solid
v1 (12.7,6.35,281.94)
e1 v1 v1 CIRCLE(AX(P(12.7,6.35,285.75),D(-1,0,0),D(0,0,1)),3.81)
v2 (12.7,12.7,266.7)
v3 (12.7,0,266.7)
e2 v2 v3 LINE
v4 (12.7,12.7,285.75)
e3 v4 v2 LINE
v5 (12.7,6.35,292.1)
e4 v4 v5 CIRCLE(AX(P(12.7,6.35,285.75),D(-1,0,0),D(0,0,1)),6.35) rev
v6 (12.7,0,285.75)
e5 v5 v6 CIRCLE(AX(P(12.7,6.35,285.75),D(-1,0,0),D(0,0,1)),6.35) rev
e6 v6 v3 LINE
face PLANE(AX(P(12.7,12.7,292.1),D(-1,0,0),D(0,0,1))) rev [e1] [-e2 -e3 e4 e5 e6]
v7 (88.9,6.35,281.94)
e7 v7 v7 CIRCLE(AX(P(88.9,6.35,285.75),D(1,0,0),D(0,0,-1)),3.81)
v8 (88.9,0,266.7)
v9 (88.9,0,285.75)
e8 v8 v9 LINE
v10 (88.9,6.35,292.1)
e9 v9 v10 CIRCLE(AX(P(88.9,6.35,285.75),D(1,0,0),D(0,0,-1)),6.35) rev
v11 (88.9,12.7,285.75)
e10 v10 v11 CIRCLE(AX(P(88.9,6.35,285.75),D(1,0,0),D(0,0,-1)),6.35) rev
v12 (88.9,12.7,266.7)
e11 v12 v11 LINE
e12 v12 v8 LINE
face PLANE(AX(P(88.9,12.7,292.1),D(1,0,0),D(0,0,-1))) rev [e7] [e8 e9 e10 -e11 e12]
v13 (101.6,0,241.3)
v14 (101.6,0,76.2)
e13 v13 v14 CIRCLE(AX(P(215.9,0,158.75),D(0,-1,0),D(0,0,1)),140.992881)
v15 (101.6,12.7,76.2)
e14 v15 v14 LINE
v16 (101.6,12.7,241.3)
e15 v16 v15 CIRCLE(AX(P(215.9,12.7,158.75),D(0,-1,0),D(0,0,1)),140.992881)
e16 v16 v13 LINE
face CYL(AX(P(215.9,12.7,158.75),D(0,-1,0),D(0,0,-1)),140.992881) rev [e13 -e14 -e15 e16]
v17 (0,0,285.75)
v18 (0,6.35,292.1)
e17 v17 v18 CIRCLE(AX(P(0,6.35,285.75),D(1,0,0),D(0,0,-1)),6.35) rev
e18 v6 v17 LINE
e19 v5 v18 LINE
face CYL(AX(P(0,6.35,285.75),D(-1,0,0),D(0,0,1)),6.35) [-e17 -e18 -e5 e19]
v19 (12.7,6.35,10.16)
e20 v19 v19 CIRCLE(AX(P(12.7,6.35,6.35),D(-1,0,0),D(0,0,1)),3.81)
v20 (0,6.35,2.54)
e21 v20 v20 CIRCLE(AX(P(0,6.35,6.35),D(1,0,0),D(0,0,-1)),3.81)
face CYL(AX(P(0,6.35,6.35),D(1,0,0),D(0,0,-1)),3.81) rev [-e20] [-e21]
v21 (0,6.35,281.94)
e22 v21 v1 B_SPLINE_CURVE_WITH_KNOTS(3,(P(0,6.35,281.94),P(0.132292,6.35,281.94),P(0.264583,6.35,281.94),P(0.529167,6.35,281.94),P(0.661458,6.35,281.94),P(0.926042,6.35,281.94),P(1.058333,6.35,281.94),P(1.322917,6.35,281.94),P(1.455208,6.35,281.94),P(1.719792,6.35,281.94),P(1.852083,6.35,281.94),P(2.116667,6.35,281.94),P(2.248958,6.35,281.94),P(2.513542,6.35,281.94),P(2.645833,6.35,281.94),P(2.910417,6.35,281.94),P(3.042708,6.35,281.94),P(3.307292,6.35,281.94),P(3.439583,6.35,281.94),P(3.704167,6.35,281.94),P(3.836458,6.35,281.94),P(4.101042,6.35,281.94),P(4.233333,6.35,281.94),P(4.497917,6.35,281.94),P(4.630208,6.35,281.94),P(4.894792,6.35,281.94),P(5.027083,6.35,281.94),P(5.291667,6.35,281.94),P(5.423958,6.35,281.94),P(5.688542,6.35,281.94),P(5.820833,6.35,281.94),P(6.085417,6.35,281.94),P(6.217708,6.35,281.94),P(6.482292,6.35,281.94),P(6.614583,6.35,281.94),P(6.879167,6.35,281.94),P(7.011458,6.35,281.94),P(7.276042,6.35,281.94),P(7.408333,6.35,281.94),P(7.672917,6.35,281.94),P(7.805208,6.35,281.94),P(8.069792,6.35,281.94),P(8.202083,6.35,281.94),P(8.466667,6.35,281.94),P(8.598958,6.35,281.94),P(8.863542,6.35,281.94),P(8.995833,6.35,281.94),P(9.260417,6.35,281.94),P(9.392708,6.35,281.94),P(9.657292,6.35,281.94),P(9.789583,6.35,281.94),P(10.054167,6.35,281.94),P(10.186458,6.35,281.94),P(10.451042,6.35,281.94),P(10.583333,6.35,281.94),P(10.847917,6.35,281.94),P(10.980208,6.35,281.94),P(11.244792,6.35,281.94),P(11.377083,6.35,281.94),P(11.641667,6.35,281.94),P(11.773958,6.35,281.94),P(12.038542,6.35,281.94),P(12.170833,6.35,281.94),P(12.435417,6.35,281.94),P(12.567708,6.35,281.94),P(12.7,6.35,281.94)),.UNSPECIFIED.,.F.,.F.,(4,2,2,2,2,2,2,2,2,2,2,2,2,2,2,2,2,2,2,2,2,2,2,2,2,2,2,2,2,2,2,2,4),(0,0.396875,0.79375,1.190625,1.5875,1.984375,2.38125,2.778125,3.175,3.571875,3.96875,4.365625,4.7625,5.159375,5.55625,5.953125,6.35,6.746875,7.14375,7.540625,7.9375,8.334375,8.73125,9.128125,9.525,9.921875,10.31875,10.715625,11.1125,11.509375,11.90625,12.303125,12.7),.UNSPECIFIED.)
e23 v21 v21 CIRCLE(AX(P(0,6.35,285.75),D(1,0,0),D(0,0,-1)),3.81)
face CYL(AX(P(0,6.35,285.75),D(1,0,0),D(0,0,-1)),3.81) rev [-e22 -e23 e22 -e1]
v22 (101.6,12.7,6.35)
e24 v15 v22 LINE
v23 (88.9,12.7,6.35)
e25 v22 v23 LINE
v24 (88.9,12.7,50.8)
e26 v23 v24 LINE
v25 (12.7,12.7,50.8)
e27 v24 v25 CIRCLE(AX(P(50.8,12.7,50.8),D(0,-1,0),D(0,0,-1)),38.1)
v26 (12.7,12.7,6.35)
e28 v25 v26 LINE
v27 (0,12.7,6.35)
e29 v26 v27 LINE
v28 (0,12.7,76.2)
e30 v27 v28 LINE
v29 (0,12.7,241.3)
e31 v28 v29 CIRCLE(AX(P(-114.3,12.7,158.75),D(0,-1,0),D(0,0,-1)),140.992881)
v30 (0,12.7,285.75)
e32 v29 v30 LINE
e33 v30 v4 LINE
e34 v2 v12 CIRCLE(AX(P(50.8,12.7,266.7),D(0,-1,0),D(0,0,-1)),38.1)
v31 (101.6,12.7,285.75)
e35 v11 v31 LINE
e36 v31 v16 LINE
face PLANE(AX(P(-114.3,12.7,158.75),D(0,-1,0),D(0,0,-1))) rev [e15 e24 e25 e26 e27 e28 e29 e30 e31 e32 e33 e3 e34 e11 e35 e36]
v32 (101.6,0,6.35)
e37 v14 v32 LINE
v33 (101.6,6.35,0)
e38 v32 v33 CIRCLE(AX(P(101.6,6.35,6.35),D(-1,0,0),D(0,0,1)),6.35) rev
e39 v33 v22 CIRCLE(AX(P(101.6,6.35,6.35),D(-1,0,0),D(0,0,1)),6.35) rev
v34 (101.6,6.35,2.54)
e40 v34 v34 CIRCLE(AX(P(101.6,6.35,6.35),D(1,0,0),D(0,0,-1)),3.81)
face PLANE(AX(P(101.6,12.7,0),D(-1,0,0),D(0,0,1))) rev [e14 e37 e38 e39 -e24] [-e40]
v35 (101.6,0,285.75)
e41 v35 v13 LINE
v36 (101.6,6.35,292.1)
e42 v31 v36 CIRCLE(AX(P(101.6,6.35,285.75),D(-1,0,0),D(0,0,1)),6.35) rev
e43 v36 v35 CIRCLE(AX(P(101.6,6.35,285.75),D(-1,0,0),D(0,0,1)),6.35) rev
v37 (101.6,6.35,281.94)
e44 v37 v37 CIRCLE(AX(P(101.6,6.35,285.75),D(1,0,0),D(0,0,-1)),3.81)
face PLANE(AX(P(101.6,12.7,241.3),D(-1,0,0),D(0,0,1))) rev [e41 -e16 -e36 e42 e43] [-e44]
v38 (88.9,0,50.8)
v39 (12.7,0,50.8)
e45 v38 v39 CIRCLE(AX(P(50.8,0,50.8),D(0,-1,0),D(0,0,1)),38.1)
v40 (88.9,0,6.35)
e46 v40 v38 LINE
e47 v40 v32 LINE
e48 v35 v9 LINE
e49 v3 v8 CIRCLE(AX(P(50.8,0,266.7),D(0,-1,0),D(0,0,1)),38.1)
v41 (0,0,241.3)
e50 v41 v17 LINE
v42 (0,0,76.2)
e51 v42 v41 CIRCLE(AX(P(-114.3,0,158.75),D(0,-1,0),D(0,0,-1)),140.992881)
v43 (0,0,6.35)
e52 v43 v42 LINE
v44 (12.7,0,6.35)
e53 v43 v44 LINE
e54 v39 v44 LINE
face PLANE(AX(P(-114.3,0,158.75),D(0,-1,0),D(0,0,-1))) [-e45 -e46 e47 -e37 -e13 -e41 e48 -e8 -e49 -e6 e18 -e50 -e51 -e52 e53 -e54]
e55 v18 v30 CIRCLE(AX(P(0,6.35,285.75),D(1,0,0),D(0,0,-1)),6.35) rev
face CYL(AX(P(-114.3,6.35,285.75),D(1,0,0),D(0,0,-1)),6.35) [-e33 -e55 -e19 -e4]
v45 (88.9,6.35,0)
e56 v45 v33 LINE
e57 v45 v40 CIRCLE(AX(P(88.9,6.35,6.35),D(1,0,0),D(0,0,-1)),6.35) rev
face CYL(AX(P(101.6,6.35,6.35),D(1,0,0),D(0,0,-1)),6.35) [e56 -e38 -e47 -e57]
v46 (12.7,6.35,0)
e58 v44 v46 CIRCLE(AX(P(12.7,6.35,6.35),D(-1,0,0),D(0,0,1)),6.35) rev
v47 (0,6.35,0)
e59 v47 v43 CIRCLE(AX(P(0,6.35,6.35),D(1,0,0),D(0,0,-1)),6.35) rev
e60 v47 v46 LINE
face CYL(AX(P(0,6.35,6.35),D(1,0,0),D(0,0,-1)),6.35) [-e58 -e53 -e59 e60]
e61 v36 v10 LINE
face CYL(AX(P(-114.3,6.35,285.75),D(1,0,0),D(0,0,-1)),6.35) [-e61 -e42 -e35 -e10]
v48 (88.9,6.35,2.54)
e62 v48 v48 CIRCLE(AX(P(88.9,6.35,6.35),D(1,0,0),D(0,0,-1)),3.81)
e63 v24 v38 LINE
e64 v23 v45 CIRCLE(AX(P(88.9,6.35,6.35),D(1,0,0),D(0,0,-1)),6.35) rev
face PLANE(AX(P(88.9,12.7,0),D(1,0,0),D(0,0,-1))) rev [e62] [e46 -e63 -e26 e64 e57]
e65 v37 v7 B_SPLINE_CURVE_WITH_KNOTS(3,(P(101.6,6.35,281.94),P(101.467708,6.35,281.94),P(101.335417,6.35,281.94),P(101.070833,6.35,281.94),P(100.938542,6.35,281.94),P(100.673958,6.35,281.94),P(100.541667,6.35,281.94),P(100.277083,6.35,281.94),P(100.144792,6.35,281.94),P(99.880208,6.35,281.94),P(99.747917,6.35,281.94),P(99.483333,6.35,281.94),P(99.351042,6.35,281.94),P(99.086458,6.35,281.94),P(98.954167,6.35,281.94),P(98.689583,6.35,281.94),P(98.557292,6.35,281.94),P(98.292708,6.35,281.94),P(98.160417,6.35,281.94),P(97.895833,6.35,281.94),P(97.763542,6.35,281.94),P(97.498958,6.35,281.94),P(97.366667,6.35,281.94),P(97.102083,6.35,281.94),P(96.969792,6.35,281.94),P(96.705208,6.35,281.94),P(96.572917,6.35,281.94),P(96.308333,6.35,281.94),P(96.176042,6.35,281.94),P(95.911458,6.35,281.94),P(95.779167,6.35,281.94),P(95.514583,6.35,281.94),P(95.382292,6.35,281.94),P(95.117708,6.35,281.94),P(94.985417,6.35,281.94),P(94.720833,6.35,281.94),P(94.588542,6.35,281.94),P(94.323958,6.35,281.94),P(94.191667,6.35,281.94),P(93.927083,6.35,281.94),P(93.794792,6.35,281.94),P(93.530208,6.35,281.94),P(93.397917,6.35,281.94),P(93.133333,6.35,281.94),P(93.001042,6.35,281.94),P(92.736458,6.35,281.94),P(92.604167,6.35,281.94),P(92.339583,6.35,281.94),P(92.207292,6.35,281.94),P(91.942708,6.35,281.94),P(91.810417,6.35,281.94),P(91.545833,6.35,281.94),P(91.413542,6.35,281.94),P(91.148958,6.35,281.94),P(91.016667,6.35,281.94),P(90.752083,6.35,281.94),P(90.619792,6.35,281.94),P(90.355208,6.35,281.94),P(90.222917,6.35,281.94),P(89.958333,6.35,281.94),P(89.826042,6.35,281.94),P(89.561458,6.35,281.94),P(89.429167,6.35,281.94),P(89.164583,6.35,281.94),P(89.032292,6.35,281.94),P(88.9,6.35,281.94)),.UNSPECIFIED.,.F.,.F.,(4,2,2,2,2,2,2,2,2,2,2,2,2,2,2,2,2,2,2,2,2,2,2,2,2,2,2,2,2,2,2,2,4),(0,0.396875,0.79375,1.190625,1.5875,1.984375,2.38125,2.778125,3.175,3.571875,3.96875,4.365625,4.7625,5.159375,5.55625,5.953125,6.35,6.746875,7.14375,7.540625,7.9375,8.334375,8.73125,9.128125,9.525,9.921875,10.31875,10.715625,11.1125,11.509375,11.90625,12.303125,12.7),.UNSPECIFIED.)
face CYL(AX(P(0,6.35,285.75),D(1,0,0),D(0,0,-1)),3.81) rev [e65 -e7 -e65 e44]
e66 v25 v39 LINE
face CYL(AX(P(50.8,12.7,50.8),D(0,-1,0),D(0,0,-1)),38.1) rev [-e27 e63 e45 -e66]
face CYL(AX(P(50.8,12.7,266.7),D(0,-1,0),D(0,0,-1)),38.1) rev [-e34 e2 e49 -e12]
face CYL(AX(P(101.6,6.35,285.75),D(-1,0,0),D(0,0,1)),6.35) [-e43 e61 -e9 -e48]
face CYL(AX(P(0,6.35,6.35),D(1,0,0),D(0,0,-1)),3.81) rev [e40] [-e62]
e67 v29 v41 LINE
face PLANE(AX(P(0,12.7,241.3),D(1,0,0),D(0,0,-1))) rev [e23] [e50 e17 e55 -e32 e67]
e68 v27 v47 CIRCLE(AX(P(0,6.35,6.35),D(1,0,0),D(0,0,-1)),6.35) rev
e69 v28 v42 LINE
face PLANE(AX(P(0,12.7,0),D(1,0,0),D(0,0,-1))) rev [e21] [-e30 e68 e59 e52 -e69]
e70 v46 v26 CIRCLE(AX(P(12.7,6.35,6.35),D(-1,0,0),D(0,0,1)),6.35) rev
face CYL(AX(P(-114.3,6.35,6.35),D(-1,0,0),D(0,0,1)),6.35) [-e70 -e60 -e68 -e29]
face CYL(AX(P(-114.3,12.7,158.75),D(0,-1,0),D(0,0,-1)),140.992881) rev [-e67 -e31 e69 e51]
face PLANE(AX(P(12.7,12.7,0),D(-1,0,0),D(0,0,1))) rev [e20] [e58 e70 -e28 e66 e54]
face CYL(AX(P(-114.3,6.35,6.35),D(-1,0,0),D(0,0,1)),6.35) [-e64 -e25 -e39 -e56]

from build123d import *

# Parameters (mm, degrees)
BOSS_EXTRUDE1_DEPTH = 12.7
FILLET1_R           = 6.35
SKETCH2_R           = 3.81
CUT_EXTRUDE1_DEPTH  = 310.525863217
SKETCH3_R           = 3.81
CUT_EXTRUDE2_DEPTH  = 310.525863217


with BuildPart() as part:
    # Sketch1 → Boss-Extrude1 (new body)
    with BuildSketch(Plane(origin=(0, 0, 0), x_dir=(1, 0, 0), z_dir=(0, 1, 0))):
        with BuildLine():
            Line((0, 0), (12.7, 0))
            Line((12.7, 0), (12.7, -50.8))
            ThreePointArc((12.7, -50.8), (23.859231637, -77.740768363), (50.8, -88.9))
            ThreePointArc((50.8, -88.9), (77.740768363, -77.740768363), (88.9, -50.8))
            Line((88.9, -50.8), (88.9, 0))
            Line((88.9, 0), (101.6, 0))
            Line((101.6, 0), (101.6, -76.2))
            ThreePointArc((101.6, -76.2), (74.907118974, -158.75), (101.6, -241.3))
            Line((101.6, -241.3), (101.6, -292.1))
            Line((101.6, -292.1), (88.9, -292.1))
            Line((88.9, -292.1), (88.9, -266.7))
            ThreePointArc((88.9, -266.7), (77.740768363, -239.759231637), (50.8, -228.6))
            ThreePointArc((50.8, -228.6), (23.859231637, -239.759231637), (12.7, -266.7))
            Line((12.7, -266.7), (12.7, -292.1))
            Line((12.7, -292.1), (0, -292.1))
            Line((0, -292.1), (0, -241.3))
            ThreePointArc((0, -241.3), (26.692881026, -158.75), (0, -76.2))
            Line((0, -76.2), (0, 0))
        make_face()
    extrude(amount=BOSS_EXTRUDE1_DEPTH)

    # Fillet1
    fillet1_edges = [part.edges().sort_by_distance(p)[0] for p in [
        (95.25, 0, 0),
        (6.35, 0, 0),
        (95.25, 12.7, 0),
        (6.35, 12.7, 0),
        (6.35, 0, 292.1),
        (6.35, 12.7, 292.1),
        (95.25, 0, 292.1),
        (95.25, 12.7, 292.1),
    ]]
    fillet(fillet1_edges, radius=FILLET1_R - 0.0001)  # a hair under: the kernel refuses the full size

    # Sketch2 → Cut-Extrude1 (cut, through all)
    with BuildSketch(Plane(origin=(101.6, 0, 0), x_dir=(0, 0, -1), z_dir=(1, 0, 0))):
        with Locations((-285.75, 6.35)):
            Circle(SKETCH2_R)
    extrude(amount=-CUT_EXTRUDE1_DEPTH, mode=Mode.SUBTRACT)

    # Sketch3 → Cut-Extrude2 (cut, through all)
    with BuildSketch(Plane(origin=(101.6, 0, 0), x_dir=(0, 0, -1), z_dir=(1, 0, 0))):
        with Locations((-6.35, 6.35)):
            Circle(SKETCH3_R)
    extrude(amount=-CUT_EXTRUDE2_DEPTH, mode=Mode.SUBTRACT)


solid = part.part
